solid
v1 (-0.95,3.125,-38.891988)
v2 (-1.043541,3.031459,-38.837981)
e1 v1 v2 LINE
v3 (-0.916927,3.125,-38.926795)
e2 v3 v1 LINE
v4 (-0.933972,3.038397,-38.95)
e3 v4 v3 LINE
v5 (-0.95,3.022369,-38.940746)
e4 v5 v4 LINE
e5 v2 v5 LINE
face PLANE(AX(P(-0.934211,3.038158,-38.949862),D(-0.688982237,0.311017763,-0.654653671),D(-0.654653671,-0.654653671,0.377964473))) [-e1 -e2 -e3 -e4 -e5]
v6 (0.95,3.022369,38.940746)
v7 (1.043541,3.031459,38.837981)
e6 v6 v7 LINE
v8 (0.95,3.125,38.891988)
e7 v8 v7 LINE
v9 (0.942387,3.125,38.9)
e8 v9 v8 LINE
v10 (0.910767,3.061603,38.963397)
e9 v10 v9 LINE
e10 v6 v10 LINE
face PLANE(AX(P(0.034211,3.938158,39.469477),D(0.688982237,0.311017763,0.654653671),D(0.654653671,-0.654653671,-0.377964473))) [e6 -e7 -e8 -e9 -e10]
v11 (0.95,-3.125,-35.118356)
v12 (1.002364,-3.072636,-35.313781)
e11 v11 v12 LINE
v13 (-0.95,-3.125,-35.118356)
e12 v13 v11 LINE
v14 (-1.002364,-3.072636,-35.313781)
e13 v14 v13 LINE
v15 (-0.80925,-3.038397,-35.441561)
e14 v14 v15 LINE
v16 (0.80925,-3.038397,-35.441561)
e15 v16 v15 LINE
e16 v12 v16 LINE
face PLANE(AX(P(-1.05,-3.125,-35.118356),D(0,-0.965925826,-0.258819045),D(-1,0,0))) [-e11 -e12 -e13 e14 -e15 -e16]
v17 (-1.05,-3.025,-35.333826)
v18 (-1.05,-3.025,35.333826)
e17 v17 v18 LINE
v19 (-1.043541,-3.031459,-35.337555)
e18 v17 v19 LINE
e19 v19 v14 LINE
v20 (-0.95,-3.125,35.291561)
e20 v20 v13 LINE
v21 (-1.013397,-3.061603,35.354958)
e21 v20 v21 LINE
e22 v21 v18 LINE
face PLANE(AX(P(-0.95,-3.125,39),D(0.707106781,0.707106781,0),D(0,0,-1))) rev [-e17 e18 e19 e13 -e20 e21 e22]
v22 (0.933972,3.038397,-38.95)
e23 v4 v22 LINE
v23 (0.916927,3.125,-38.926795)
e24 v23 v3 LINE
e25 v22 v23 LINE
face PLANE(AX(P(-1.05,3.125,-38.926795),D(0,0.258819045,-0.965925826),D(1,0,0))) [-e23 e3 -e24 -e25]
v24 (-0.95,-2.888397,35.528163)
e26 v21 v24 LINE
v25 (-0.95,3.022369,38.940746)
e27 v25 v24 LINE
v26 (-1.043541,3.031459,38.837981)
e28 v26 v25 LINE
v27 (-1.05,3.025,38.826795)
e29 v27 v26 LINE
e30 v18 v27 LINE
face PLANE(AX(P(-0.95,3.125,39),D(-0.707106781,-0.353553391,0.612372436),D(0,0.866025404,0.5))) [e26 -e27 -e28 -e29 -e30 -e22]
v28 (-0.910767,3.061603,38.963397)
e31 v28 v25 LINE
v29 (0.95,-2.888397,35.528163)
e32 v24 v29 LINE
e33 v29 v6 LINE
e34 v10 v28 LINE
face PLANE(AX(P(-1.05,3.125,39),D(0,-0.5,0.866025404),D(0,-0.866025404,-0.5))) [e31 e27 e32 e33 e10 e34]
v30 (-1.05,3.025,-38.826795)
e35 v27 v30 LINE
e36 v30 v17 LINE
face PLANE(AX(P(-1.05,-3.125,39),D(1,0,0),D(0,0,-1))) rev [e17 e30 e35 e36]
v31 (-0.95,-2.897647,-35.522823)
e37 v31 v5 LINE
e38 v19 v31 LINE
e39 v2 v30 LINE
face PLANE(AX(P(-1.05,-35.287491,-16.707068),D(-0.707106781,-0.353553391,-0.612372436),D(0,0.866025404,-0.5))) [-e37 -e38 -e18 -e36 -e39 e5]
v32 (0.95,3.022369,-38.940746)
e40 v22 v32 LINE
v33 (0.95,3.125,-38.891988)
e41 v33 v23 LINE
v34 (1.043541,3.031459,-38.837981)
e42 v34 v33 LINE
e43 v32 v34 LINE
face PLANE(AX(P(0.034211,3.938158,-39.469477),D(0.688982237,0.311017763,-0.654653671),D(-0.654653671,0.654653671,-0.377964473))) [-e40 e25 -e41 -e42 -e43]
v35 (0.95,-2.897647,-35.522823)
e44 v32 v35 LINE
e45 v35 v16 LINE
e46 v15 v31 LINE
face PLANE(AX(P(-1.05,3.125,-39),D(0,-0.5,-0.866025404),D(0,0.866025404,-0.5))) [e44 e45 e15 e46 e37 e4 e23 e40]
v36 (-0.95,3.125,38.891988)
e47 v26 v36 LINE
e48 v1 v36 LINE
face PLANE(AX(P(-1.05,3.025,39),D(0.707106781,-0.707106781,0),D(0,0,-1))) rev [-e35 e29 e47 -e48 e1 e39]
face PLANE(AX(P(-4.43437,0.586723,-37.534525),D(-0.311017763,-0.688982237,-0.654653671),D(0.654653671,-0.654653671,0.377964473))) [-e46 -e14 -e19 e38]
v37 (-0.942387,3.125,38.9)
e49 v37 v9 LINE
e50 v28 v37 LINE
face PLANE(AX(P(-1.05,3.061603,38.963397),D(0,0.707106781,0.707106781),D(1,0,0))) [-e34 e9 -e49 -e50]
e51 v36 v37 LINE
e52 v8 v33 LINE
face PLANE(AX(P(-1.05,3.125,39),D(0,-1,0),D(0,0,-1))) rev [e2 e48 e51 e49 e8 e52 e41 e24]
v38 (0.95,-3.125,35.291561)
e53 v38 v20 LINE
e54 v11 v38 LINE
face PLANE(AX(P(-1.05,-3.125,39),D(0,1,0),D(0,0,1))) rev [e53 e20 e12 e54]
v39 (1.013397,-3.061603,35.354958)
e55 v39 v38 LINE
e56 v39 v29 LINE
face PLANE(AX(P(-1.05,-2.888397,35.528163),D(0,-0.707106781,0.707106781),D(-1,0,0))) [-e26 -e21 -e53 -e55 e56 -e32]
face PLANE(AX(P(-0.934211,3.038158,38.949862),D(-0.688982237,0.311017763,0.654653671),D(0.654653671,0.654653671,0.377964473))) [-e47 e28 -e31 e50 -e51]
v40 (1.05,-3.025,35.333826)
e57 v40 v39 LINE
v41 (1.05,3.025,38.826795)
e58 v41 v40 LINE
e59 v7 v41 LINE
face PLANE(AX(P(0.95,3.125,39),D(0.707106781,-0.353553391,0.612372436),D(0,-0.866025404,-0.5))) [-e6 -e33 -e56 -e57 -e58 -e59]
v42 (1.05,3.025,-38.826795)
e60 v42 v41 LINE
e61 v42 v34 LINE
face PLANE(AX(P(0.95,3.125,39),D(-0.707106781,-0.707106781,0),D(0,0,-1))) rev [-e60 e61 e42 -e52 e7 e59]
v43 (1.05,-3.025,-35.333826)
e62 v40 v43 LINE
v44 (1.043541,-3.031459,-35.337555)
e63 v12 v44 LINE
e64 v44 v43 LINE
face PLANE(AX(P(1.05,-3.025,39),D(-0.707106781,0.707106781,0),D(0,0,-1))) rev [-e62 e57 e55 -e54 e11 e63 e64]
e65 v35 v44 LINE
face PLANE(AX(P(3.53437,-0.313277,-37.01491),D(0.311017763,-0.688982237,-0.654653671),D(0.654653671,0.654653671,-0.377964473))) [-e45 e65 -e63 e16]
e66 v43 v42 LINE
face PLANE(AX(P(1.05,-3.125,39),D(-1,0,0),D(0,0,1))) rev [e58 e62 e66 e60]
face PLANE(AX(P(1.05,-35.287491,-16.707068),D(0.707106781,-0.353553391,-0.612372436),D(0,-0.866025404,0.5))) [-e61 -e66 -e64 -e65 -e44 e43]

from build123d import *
from OCP.BRepFilletAPI import BRepFilletAPI_MakeChamfer

# Parameters (mm, degrees)
SKETCH1_W           = 2.1
SKETCH1_H           = 6.25
BOSS_EXTRUDE1_DEPTH = 39
DRAFT1_ANGLE        = -30
DRAFT2_ANGLE        = -30
CHAMFER1_SIZE       = 0.1
CHAMFER2_SIZE       = 0.273205081
CHAMFER2_SIZE_2     = 0.1
CHAMFER2_SIZE_3     = 0.073205081
CHAMFER2_SIZE_4     = 0.077581461
CHAMFER2_SIZE_5     = 0.171862365


with BuildPart() as part:
    # Sketch1 → Boss-Extrude1 (new, symmetric)
    with BuildSketch(Plane.XY):
        Rectangle(SKETCH1_W, SKETCH1_H)
    extrude(amount=BOSS_EXTRUDE1_DEPTH, both=True)

    # Draft1
    draft1_faces = [part.faces().sort_by_distance(p)[0] for p in [
        (0, 0, 39),
    ]]
    draft(draft1_faces, Plane(origin=(-1.05, 3.125, 39), x_dir=(0, 0, 1), z_dir=(0, 1, 0)), DRAFT1_ANGLE)

    # Draft2
    draft2_faces = [part.faces().sort_by_distance(p)[0] for p in [
        (0, 0, -39),
    ]]
    draft(draft2_faces, Plane(origin=(-1.05, 3.125, 39), x_dir=(0, 0, 1), z_dir=(0, 1, 0)), DRAFT2_ANGLE)

    # Chamfer1
    chamfer1_edges = [part.edges().sort_by_distance(p)[0] for p in [
        (1.05, -3.125, 0),
        (-1.05, -3.125, 0),
        (-1.05, 3.125, 0),
        (1.05, 3.125, 0),
    ]]
    chamfer(chamfer1_edges, length=CHAMFER1_SIZE)

    # Chamfer2
    chamfer2_edges_1 = [part.edges().sort_by_distance(p)[0] for p in [
        (0, -3.125, -35.391560818),
    ]]
    chamfer2_side_1 = [part.faces().sort_by_distance(p)[0] for p in [
        (0, -3.125, -35.389560818),
    ]]
    chamfer2_edges_2 = [part.edges().sort_by_distance(p)[0] for p in [
        (0, -3.125, 35.391560818),
    ]]
    chamfer2_side_2 = [part.faces().sort_by_distance(p)[0] for p in [
        (0, -3.125, 35.389560818),
    ]]
    chamfer2_edges_3 = [part.edges().sort_by_distance(p)[0] for p in [
        (0, 3.125, -39),
    ]]
    chamfer2_side_3 = [part.faces().sort_by_distance(p)[0] for p in [
        (0, 3.123732051, -38.999267949),
    ]]
    chamfer2_edges_4 = [part.edges().sort_by_distance(p)[0] for p in [
        (1, 3.075, -38.971132487),
    ]]
    chamfer2_side_4 = [part.faces().sort_by_distance(p)[0] for p in [
        (0.998827079, 3.074120309, -38.970624597),
    ]]
    chamfer2_edges_5 = [part.edges().sort_by_distance(p)[0] for p in [
        (1, 3.075, 38.971132487),
    ]]
    chamfer2_side_5 = [part.faces().sort_by_distance(p)[0] for p in [
        (0.998827079, 3.074120309, 38.970624597),
    ]]
    chamfer2_edges_6 = [part.edges().sort_by_distance(p)[0] for p in [
        (-1, 3.075, -38.971132487),
    ]]
    chamfer2_side_6 = [part.faces().sort_by_distance(p)[0] for p in [
        (-0.998827079, 3.074120309, -38.970624597),
    ]]
    chamfer2_edges_7 = [part.edges().sort_by_distance(p)[0] for p in [
        (-1, 3.075, 38.971132487),
    ]]
    chamfer2_side_7 = [part.faces().sort_by_distance(p)[0] for p in [
        (-0.998827079, 3.074120309, 38.970624597),
    ]]
    chamfer2_edges_8 = [part.edges().sort_by_distance(p)[0] for p in [
        (0, 3.125, 39),
    ]]
    chamfer2_side_8 = [part.faces().sort_by_distance(p)[0] for p in [
        (0, 3.123732051, 38.999267949),
    ]]
    chamfer2 = BRepFilletAPI_MakeChamfer(part.part.solid().wrapped)
    for e in chamfer2_edges_1:
        chamfer2.Add(CHAMFER2_SIZE, CHAMFER2_SIZE_2, e.wrapped, chamfer2_side_1[0].wrapped)
    for e in chamfer2_edges_2:
        chamfer2.Add(CHAMFER2_SIZE_2, CHAMFER2_SIZE, e.wrapped, chamfer2_side_2[0].wrapped)
    for e in chamfer2_edges_3:
        chamfer2.Add(CHAMFER2_SIZE_2, CHAMFER2_SIZE_3, e.wrapped, chamfer2_side_3[0].wrapped)
    for e in chamfer2_edges_4:
        chamfer2.Add(CHAMFER2_SIZE_4, CHAMFER2_SIZE_2, e.wrapped, chamfer2_side_4[0].wrapped)
    for e in chamfer2_edges_5:
        chamfer2.Add(CHAMFER2_SIZE_4, CHAMFER2_SIZE_2, e.wrapped, chamfer2_side_5[0].wrapped)
    for e in chamfer2_edges_6:
        chamfer2.Add(CHAMFER2_SIZE_4, CHAMFER2_SIZE_2, e.wrapped, chamfer2_side_6[0].wrapped)
    for e in chamfer2_edges_7:
        chamfer2.Add(CHAMFER2_SIZE_4, CHAMFER2_SIZE_2, e.wrapped, chamfer2_side_7[0].wrapped)
    for e in chamfer2_edges_8:
        chamfer2.Add(CHAMFER2_SIZE_3, CHAMFER2_SIZE_2, e.wrapped, chamfer2_side_8[0].wrapped)
    add(Compound.cast(chamfer2.Shape()), mode=Mode.REPLACE)
    chamfer2_2_edges_1 = [part.edges().sort_by_distance(p)[0] for p in [
        (1.04330127, -3.03169873, -35.445428331),
    ]]
    chamfer2_2_side_1 = [part.faces().sort_by_distance(p)[0] for p in [
        (1.043835793, -3.031164207, -35.443576691),
    ]]
    chamfer2_2_edges_2 = [part.edges().sort_by_distance(p)[0] for p in [
        (-1.04330127, -3.03169873, -35.445428331),
    ]]
    chamfer2_2_side_2 = [part.faces().sort_by_distance(p)[0] for p in [
        (-1.043835793, -3.031164207, -35.443576691),
    ]]
    chamfer2_2 = BRepFilletAPI_MakeChamfer(part.part.solid().wrapped)
    for e in chamfer2_2_edges_1:
        chamfer2_2.Add(CHAMFER2_SIZE_2, CHAMFER2_SIZE_5, e.wrapped, chamfer2_2_side_1[0].wrapped)
    for e in chamfer2_2_edges_2:
        chamfer2_2.Add(CHAMFER2_SIZE_2, CHAMFER2_SIZE_5, e.wrapped, chamfer2_2_side_2[0].wrapped)
    add(Compound.cast(chamfer2_2.Shape()), mode=Mode.REPLACE)
    chamfer2_3_edges = [part.edges().sort_by_distance(p)[0] for p in [
        (1.05, 0.062360956, -37.231784524),
        (-1.05, 0.062360956, -37.231784524),
        (-1.05, 0.016985957, 37.205587256),
        (1.05, 0.016985957, 37.205587256),
    ]]
    chamfer(chamfer2_3_edges, length=CHAMFER2_SIZE_2)


solid = part.part
